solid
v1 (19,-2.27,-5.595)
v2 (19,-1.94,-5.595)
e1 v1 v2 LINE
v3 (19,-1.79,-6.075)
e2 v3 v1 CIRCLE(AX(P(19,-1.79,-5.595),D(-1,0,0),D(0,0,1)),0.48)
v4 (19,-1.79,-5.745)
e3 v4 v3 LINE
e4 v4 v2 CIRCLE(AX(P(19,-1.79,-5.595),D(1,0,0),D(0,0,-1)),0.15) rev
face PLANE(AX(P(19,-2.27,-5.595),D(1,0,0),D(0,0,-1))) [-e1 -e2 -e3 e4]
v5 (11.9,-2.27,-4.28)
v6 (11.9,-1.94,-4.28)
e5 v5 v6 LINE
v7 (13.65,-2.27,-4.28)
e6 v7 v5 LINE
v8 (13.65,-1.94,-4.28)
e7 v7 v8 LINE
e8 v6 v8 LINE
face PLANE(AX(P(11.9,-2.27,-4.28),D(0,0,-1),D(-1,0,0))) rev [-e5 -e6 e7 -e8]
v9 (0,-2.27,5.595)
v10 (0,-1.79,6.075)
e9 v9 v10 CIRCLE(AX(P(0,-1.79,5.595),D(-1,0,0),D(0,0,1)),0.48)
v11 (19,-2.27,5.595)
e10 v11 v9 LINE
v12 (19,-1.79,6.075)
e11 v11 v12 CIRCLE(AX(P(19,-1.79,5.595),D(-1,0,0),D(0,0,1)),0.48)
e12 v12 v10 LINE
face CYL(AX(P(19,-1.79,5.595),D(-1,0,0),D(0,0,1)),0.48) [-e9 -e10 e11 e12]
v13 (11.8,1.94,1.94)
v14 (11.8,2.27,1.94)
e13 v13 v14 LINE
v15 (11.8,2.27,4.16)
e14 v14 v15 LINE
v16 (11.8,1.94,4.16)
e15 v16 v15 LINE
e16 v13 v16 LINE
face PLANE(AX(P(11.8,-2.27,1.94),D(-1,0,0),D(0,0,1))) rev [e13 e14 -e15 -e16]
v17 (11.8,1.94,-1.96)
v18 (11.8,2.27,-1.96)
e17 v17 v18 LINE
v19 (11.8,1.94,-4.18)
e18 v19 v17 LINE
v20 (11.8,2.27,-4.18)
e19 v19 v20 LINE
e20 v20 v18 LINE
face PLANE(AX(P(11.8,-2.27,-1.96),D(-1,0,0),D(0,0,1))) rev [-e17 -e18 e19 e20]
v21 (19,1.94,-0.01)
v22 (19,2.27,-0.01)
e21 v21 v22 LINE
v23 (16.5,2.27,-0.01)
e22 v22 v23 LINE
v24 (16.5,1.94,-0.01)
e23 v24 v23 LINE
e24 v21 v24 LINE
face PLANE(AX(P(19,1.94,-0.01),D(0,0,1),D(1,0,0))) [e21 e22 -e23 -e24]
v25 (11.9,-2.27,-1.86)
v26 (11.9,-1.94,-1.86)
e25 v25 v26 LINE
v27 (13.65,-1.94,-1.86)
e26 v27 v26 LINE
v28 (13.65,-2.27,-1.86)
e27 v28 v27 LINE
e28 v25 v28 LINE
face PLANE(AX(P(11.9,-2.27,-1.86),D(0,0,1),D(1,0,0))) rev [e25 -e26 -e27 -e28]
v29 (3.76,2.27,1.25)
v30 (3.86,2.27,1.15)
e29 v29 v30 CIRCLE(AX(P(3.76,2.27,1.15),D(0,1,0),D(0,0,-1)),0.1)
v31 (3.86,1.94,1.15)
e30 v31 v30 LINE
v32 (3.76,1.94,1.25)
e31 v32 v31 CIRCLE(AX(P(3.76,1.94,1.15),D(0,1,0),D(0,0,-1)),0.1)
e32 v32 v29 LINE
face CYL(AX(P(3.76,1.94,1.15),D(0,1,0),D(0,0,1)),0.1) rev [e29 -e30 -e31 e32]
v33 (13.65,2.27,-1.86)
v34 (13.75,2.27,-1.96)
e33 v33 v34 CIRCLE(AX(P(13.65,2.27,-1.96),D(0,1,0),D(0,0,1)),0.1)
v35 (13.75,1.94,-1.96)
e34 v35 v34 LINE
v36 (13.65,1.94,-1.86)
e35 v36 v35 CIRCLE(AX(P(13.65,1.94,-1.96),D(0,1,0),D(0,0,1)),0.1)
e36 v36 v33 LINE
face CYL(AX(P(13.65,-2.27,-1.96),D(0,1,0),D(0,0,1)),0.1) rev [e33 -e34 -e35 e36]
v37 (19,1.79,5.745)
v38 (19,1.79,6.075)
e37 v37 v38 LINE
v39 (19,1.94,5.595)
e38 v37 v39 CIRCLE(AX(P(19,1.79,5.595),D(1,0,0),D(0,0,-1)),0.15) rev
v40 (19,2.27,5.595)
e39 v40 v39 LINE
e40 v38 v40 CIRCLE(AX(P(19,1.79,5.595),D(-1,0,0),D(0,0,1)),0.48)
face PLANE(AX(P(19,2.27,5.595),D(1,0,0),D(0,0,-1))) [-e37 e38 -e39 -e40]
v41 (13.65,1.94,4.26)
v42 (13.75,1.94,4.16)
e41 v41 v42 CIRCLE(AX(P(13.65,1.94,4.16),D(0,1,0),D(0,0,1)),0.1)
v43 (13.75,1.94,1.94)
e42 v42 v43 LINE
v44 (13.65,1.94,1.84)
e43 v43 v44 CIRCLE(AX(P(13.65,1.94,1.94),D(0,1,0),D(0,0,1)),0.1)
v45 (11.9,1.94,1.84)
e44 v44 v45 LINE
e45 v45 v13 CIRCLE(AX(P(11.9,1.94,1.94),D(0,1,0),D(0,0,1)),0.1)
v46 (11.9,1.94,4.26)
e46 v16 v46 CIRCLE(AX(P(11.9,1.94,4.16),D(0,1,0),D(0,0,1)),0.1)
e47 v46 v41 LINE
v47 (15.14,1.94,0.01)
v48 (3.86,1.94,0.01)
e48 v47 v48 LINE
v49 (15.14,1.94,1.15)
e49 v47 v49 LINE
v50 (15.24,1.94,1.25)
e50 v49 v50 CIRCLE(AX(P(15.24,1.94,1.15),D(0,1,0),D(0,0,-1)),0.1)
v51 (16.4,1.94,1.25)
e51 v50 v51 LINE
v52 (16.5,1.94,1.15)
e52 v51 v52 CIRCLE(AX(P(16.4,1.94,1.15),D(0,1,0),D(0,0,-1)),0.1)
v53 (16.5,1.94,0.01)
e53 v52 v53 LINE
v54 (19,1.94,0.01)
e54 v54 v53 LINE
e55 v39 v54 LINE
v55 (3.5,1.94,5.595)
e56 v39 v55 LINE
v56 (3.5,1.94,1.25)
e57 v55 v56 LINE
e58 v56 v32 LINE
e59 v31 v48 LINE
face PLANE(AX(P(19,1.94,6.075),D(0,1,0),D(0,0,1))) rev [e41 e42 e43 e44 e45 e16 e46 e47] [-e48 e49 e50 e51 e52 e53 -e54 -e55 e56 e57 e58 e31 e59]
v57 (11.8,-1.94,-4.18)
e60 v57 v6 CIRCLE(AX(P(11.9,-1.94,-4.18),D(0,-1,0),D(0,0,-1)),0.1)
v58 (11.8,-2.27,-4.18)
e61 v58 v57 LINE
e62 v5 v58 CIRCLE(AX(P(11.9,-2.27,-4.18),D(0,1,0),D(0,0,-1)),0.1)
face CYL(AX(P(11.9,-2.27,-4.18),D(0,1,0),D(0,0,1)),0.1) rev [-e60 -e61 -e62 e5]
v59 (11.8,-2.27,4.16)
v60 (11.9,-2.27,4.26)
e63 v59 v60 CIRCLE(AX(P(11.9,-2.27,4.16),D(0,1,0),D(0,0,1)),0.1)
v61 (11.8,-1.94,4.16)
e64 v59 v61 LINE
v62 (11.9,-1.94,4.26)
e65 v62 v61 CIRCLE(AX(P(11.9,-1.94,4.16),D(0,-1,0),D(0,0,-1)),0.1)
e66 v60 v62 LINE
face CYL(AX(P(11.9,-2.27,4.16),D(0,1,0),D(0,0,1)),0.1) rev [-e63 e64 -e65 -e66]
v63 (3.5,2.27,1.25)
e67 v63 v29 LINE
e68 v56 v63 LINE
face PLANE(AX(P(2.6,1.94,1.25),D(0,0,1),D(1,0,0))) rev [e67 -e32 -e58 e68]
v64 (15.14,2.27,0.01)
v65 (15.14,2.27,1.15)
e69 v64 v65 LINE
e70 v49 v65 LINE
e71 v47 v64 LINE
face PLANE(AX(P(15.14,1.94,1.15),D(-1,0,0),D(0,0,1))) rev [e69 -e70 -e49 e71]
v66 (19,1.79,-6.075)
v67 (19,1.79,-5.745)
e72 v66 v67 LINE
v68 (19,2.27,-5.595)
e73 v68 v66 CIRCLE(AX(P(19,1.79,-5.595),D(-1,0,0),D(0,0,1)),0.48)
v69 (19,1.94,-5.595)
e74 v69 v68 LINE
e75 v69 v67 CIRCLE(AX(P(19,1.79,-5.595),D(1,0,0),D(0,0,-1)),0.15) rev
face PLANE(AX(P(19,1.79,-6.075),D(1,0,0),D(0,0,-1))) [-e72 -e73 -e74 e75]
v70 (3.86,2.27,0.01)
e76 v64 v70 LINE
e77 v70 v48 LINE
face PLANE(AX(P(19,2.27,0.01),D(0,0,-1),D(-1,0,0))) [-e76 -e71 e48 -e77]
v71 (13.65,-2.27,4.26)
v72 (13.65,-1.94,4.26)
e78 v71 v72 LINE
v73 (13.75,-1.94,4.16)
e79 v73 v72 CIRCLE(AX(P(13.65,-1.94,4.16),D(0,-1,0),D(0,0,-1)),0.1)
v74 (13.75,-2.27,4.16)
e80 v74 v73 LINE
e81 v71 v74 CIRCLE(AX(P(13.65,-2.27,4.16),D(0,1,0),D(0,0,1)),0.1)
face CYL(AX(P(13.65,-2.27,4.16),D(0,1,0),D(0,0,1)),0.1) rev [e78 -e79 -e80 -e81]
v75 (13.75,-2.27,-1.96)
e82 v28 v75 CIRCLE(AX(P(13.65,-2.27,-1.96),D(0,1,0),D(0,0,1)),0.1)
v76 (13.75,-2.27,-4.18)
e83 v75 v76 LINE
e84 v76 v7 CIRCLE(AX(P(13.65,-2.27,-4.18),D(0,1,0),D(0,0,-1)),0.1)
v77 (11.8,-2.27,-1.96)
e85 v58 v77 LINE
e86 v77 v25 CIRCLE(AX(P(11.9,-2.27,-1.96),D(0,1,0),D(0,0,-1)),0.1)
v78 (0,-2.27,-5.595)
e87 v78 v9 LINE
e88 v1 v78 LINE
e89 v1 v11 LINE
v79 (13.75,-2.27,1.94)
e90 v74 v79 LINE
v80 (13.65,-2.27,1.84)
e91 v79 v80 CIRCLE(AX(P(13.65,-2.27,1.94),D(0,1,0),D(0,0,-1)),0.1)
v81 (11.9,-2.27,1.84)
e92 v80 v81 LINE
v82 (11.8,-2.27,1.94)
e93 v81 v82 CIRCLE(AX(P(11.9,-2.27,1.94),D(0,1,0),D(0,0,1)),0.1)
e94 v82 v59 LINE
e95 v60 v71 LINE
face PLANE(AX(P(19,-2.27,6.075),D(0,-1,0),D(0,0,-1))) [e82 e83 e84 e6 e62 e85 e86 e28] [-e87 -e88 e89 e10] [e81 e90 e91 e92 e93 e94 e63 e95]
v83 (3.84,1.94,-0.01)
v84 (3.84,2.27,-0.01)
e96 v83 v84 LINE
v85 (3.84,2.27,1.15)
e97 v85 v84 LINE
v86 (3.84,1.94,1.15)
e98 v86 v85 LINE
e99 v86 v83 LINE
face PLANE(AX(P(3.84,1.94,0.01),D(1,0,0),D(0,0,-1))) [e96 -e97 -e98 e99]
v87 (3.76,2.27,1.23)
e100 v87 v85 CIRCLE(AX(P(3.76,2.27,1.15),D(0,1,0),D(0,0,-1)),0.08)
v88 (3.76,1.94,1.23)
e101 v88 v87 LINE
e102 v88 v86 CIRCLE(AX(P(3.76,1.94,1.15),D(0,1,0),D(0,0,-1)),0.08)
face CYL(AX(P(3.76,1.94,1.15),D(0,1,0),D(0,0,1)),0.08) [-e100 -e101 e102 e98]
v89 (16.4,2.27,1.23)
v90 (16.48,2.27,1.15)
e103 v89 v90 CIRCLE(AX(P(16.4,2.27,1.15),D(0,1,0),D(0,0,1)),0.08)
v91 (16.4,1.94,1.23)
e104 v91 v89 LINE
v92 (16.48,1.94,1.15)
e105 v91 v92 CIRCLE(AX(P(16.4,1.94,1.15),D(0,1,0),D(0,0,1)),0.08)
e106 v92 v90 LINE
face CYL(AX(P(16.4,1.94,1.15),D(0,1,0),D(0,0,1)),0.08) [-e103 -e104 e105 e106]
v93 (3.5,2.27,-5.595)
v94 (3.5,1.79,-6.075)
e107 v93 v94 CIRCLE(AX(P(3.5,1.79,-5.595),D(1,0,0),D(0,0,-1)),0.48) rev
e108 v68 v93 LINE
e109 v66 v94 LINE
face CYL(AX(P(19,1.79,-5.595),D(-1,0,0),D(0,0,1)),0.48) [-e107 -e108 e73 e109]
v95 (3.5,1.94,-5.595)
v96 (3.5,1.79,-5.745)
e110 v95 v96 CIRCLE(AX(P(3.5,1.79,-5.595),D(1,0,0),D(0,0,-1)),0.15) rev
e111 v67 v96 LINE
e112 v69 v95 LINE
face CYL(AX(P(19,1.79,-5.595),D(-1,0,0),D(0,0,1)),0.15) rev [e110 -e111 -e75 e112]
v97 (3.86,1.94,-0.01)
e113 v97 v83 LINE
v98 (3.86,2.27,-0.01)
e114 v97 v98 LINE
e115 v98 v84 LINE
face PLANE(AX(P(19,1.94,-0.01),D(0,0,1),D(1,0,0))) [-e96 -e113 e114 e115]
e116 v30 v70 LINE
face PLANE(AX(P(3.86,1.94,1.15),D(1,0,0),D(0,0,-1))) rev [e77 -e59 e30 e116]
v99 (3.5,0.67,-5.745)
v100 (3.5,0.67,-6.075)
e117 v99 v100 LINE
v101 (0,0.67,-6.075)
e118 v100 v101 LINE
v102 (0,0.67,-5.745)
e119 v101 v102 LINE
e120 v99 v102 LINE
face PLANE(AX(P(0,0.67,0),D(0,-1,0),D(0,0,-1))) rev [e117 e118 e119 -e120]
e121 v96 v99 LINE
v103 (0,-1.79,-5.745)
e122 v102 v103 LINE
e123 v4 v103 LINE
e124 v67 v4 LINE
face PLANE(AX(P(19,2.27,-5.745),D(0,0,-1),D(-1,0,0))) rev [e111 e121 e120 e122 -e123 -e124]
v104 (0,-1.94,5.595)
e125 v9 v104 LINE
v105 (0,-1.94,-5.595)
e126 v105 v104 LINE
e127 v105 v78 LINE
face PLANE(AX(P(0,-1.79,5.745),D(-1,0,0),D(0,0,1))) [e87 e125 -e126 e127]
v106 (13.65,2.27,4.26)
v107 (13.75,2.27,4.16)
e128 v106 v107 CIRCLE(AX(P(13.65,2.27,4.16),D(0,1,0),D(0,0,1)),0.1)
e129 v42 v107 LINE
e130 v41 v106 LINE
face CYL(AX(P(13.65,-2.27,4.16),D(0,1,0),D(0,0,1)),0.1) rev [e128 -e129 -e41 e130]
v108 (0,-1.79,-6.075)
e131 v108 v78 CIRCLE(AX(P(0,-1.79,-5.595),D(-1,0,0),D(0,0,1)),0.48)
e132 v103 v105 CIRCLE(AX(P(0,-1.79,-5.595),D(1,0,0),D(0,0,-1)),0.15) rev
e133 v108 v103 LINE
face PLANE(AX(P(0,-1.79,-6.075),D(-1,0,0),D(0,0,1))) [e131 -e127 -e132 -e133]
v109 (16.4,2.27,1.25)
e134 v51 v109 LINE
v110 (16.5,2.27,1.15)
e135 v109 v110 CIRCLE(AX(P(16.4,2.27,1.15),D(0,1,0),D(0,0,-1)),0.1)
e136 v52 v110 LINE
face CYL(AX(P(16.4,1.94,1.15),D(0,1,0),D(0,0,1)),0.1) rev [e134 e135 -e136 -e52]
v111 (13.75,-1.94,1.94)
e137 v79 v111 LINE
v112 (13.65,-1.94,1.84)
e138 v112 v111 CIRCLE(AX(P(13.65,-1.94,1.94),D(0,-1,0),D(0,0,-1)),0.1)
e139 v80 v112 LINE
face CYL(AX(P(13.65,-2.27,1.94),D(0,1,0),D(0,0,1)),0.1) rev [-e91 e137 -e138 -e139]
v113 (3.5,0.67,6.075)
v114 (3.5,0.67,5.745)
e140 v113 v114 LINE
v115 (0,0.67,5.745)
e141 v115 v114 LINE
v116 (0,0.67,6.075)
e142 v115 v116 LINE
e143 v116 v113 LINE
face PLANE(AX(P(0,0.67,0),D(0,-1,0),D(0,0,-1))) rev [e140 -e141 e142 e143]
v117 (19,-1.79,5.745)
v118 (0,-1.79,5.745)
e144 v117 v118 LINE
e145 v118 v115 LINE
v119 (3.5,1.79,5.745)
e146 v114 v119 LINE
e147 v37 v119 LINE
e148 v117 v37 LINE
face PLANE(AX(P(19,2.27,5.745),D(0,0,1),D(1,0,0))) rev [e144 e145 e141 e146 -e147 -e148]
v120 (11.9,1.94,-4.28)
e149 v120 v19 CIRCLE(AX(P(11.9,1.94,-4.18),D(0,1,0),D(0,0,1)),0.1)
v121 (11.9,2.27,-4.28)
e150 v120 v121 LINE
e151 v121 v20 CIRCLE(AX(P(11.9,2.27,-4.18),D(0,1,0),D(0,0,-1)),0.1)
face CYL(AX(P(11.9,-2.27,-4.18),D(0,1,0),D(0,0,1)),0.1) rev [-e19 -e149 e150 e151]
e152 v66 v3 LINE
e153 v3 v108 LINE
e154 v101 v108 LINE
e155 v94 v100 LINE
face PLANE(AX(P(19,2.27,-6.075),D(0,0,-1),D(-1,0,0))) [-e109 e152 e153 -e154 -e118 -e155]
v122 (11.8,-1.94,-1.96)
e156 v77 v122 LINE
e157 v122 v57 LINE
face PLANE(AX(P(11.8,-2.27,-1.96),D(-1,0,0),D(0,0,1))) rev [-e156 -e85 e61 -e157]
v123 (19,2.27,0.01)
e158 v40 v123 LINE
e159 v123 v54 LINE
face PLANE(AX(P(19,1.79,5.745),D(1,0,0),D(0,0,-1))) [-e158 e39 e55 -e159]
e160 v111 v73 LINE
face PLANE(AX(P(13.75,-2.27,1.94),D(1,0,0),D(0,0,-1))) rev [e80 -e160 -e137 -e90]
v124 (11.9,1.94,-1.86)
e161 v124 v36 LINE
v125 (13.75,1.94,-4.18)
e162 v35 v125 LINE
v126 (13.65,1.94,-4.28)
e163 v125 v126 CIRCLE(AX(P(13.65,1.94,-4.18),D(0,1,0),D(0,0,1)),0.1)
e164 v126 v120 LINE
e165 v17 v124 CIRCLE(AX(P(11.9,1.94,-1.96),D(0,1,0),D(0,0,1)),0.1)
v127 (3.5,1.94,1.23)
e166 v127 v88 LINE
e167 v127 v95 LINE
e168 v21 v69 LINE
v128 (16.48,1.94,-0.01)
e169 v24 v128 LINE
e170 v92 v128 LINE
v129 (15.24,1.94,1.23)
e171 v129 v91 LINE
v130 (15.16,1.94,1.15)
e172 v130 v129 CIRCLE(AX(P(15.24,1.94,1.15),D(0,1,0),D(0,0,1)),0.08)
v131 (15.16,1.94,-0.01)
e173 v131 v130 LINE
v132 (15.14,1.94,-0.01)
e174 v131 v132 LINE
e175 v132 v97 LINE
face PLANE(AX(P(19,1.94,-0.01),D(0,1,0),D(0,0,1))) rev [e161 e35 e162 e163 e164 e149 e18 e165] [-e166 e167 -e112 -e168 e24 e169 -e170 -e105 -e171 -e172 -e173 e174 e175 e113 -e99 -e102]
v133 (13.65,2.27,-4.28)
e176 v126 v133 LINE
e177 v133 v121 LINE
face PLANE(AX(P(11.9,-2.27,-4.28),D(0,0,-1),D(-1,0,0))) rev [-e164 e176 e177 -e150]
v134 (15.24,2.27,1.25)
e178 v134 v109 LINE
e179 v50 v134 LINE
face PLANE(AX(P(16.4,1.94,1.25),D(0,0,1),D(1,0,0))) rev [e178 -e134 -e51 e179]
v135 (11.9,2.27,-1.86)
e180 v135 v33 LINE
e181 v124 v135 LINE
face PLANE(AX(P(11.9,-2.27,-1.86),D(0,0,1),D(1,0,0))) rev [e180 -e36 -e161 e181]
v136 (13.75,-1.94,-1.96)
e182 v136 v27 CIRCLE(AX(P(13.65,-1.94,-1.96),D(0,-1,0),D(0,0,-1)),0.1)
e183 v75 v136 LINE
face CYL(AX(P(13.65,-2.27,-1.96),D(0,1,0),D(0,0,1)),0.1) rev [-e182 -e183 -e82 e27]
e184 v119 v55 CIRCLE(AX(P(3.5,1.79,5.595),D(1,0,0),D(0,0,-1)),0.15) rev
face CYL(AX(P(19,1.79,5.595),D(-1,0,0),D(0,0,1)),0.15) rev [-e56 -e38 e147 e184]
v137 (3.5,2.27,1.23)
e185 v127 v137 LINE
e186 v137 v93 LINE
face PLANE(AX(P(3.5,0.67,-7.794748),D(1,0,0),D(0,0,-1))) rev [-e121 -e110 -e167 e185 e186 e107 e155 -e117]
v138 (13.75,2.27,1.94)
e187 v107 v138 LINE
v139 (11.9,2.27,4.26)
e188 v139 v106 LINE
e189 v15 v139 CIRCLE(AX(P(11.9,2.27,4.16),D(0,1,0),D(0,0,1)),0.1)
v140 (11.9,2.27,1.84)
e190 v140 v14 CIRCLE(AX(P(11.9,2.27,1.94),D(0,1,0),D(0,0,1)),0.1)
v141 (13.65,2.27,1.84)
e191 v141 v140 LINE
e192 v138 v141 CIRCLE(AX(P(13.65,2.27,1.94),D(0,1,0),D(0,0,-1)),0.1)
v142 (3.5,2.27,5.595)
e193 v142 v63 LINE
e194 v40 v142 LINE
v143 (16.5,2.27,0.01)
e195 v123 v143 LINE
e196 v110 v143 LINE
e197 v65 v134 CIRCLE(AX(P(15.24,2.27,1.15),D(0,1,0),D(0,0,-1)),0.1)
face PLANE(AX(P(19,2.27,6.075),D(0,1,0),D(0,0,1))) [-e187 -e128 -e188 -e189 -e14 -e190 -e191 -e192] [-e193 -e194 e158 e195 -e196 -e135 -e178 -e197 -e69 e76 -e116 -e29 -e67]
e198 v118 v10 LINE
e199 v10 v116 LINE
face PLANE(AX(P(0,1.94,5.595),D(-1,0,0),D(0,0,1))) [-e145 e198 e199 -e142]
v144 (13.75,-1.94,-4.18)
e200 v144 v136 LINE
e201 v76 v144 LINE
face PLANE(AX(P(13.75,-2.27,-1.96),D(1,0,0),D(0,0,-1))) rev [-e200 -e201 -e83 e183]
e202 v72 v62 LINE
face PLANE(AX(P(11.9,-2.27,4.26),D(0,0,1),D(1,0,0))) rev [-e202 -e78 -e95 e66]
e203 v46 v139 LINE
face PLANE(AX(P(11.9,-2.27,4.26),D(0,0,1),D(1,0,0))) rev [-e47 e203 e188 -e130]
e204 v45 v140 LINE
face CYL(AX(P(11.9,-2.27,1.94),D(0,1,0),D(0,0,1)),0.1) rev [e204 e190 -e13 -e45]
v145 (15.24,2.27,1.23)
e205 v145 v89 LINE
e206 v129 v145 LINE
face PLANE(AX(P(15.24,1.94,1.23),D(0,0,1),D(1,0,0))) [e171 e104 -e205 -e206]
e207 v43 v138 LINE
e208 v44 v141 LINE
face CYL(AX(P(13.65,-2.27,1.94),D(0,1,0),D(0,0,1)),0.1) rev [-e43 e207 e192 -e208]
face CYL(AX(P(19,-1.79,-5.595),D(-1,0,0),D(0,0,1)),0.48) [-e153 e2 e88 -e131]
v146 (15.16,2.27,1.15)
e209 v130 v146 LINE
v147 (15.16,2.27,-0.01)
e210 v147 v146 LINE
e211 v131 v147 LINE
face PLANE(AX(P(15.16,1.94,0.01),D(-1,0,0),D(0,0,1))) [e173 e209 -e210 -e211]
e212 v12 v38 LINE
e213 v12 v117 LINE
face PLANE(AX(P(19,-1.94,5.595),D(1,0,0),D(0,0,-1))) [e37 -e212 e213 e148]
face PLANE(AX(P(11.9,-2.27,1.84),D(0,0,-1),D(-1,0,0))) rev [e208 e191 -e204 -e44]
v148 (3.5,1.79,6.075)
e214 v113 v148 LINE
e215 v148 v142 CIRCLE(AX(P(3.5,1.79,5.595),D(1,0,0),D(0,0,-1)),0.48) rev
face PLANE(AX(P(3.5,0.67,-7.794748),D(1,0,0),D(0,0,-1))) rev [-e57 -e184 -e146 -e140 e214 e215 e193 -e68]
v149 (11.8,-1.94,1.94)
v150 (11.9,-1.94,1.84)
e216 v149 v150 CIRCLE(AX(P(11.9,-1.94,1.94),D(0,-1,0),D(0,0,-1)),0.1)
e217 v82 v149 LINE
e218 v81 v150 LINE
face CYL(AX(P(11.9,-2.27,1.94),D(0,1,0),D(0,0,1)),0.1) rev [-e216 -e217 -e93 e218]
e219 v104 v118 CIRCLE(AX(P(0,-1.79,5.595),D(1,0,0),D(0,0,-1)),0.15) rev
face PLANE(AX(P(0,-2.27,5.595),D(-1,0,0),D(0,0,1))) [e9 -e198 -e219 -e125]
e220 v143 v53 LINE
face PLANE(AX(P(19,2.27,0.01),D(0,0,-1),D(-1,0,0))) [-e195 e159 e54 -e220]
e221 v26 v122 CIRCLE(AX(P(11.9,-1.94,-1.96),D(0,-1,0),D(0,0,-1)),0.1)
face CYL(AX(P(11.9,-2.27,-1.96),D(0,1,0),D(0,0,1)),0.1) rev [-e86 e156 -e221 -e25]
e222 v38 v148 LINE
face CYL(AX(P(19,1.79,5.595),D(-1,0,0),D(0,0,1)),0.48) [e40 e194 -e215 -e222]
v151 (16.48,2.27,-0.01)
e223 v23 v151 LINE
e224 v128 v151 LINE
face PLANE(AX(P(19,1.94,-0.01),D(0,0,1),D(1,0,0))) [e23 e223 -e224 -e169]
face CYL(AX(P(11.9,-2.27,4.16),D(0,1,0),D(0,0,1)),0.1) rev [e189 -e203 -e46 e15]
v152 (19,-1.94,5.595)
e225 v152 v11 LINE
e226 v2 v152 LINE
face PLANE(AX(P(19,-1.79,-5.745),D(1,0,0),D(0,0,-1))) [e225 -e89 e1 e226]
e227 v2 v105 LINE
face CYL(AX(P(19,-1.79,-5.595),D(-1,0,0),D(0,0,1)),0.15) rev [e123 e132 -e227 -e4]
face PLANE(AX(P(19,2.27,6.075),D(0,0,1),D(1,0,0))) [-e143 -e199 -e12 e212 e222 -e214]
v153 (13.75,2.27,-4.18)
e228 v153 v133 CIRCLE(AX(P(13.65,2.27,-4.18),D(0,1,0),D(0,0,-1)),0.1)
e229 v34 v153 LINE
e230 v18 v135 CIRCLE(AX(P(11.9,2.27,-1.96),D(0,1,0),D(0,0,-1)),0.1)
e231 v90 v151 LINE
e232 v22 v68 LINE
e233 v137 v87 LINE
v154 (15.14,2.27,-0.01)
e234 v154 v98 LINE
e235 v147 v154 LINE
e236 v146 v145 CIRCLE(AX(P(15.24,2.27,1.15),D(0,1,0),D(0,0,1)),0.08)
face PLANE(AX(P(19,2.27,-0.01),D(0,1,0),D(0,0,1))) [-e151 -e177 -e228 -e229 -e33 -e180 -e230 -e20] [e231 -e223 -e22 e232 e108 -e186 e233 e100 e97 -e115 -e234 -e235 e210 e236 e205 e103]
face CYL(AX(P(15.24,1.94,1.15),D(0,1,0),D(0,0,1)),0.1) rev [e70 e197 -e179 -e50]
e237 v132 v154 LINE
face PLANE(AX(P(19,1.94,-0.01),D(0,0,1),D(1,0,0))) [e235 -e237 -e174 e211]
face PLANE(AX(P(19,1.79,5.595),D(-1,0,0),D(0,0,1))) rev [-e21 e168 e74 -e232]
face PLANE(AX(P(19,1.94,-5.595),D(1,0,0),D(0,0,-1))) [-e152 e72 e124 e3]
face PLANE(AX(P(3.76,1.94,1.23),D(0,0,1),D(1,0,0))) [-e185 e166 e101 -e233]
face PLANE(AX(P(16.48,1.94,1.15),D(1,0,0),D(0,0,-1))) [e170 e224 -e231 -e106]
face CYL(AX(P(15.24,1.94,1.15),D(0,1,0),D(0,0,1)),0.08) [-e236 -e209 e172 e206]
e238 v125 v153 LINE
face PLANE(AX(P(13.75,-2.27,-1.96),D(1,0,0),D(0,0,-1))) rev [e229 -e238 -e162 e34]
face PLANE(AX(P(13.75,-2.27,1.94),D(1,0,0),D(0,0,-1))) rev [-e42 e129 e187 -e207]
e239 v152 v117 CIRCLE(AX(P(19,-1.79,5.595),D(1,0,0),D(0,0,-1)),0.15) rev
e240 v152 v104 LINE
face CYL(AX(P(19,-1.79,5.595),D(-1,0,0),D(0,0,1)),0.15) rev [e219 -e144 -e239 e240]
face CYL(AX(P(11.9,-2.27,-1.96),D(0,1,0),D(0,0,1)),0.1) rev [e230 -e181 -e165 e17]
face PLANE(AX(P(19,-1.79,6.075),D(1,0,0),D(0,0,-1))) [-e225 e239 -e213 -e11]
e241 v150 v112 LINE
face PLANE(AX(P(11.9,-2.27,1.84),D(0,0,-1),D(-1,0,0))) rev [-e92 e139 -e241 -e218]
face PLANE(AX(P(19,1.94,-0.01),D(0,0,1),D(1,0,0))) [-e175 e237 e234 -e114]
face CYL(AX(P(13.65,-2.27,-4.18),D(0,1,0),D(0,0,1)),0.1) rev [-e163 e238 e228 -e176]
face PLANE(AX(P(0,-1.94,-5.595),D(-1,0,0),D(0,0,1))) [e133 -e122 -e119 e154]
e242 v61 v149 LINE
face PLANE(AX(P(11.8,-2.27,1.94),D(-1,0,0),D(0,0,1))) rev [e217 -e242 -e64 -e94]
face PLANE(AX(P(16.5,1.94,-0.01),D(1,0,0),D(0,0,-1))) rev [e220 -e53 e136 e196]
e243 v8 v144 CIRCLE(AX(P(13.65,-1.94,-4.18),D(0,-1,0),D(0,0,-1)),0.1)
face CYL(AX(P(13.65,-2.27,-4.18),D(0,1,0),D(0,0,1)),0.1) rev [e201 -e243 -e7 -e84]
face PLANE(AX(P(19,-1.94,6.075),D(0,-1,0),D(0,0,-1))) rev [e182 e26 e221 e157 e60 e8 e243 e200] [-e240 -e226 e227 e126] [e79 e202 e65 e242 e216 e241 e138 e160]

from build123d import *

# Parameters (mm, degrees)
BASE_FLANGE1_DEPTH  = 19
CUT_EXTRUDE1_DEPTH  = 0.33
TAB1_DEPTH          = 0.33
CUT_EXTRUDE2_DEPTH  = 21.457693541
SKETCH_1_W          = 4.170383739
SKETCH_1_H          = 15.60949608
CUT_EXTRUDE_1_DEPTH = 1.6


# Sheet-metal steps are written as plain solids
with BuildPart() as part:
    # Sketch1 → Base-Flange1 (new body)
    with BuildSketch(Plane(origin=(0, 0, 0), x_dir=(0, 0, -1), z_dir=(1, 0, 0))):
        with BuildLine():
            Line((0.01, 2.27), (5.595, 2.27))
            ThreePointArc((5.595, 2.27), (5.934411255, 2.129411255), (6.075, 1.79))
            Line((6.075, 1.79), (6.075, -1.79))
            ThreePointArc((6.075, -1.79), (5.934411255, -2.129411255), (5.595, -2.27))
            Line((5.595, -2.27), (-5.595, -2.27))
            ThreePointArc((-5.595, -2.27), (-5.934411255, -2.129411255), (-6.075, -1.79))
            Line((-6.075, -1.79), (-6.075, 1.79))
            ThreePointArc((-6.075, 1.79), (-5.934411255, 2.129411255), (-5.595, 2.27))
            Line((-5.595, 2.27), (-0.01, 2.27))
            Line((-0.01, 2.27), (-0.01, 1.94))
            Line((-0.01, 1.94), (-5.595, 1.94))
            ThreePointArc((-5.595, 1.94), (-5.701066017, 1.896066017), (-5.745, 1.79))
            Line((-5.745, 1.79), (-5.745, -1.79))
            ThreePointArc((-5.745, -1.79), (-5.701066017, -1.896066017), (-5.595, -1.94))
            Line((-5.595, -1.94), (5.595, -1.94))
            ThreePointArc((5.595, -1.94), (5.701066017, -1.896066017), (5.745, -1.79))
            Line((5.745, -1.79), (5.745, 1.79))
            ThreePointArc((5.745, 1.79), (5.701066017, 1.896066017), (5.595, 1.94))
            Line((5.595, 1.94), (0.01, 1.94))
            Line((0.01, 1.94), (0.01, 2.27))
        make_face()
    extrude(amount=BASE_FLANGE1_DEPTH)

    # Sketch6 → Cut-Extrude1 (cut)
    with BuildSketch(Plane(origin=(0, 2.27, 0), x_dir=(1, 0, 0), z_dir=(0, 1, 0))):
        with BuildLine():
            Line((16.5, 0.01), (16.5, -1.15))
            ThreePointArc((16.5, -1.15), (16.470710678, -1.220710678), (16.4, -1.25))
            Line((16.4, -1.25), (15.24, -1.25))
            ThreePointArc((15.24, -1.25), (15.169289322, -1.220710678), (15.14, -1.15))
            Line((15.14, -1.15), (15.14, 0.01))
            Line((15.14, 0.01), (16.5, 0.01))
        make_face()
        with BuildLine():
            Line((3.86, 0.01), (2.5, 0.01))
            Line((2.5, 0.01), (2.5, -1.15))
            ThreePointArc((2.5, -1.15), (2.529289322, -1.220710678), (2.6, -1.25))
            Line((2.6, -1.25), (3.76, -1.25))
            ThreePointArc((3.76, -1.25), (3.830710678, -1.220710678), (3.86, -1.15))
            Line((3.86, -1.15), (3.86, 0.01))
        make_face()
    extrude(amount=-CUT_EXTRUDE1_DEPTH, mode=Mode.SUBTRACT)

    # Sketch7 → Tab1 (add)
    with BuildSketch(Plane(origin=(0, 2.27, 0), x_dir=(1, 0, 0), z_dir=(0, 1, 0))):
        with BuildLine():
            Line((15.16, -0.01), (15.16, 0.01))
            Line((15.16, 0.01), (16.48, 0.01))
            Line((16.48, 0.01), (16.48, -0.01))
            Line((16.48, -0.01), (16.48, -1.15))
            ThreePointArc((16.48, -1.15), (16.456568542, -1.206568542), (16.4, -1.23))
            Line((16.4, -1.23), (15.24, -1.23))
            ThreePointArc((15.24, -1.23), (15.183431458, -1.206568542), (15.16, -1.15))
            Line((15.16, -1.15), (15.16, -0.01))
        make_face()
        with BuildLine():
            Line((2.52, -0.01), (2.52, 0.01))
            Line((2.52, 0.01), (3.84, 0.01))
            Line((3.84, 0.01), (3.84, -0.01))
            Line((3.84, -0.01), (3.84, -1.15))
            ThreePointArc((3.84, -1.15), (3.816568542, -1.206568542), (3.76, -1.23))
            Line((3.76, -1.23), (2.6, -1.23))
            ThreePointArc((2.6, -1.23), (2.543431458, -1.206568542), (2.52, -1.15))
            Line((2.52, -1.15), (2.52, -0.01))
        make_face()
    extrude(amount=-TAB1_DEPTH)

    # Sketch10 → Cut-Extrude2 (cut, through all)
    with BuildSketch(Plane(origin=(0, 2.27, 0), x_dir=(1, 0, 0), z_dir=(0, 1, 0))):
        with BuildLine():
            Line((11.9, -1.84), (13.65, -1.84))
            ThreePointArc((13.65, -1.84), (13.720710678, -1.869289322), (13.75, -1.94))
            Line((13.75, -1.94), (13.75, -4.16))
            ThreePointArc((13.75, -4.16), (13.720710678, -4.230710678), (13.65, -4.26))
            Line((13.65, -4.26), (11.9, -4.26))
            ThreePointArc((11.9, -4.26), (11.829289322, -4.230710678), (11.8, -4.16))
            Line((11.8, -4.16), (11.8, -1.94))
            ThreePointArc((11.8, -1.94), (11.829289322, -1.869289322), (11.9, -1.84))
        make_face()
        with BuildLine():
            Line((13.75, 1.96), (13.75, 4.18))
            ThreePointArc((13.75, 4.18), (13.720710678, 4.250710678), (13.65, 4.28))
            Line((13.65, 4.28), (11.9, 4.28))
            ThreePointArc((11.9, 4.28), (11.829289322, 4.250710678), (11.8, 4.18))
            Line((11.8, 4.18), (11.8, 1.96))
            ThreePointArc((11.8, 1.96), (11.829289322, 1.889289322), (11.9, 1.86))
            Line((11.9, 1.86), (13.65, 1.86))
            ThreePointArc((13.65, 1.86), (13.720710678, 1.889289322), (13.75, 1.96))
        make_face()
    extrude(amount=-CUT_EXTRUDE2_DEPTH, mode=Mode.SUBTRACT)

    # Эскиз1 → Вырез-Вытянуть1 (cut)
    with BuildSketch(Plane(origin=(0, 2.27, 0), x_dir=(1, 0, 0), z_dir=(0, 1, 0))):
        with Locations((1.41480813, -0.01)):
            Rectangle(SKETCH_1_W, SKETCH_1_H)
    extrude(amount=-CUT_EXTRUDE_1_DEPTH, mode=Mode.SUBTRACT)


solid = part.part
